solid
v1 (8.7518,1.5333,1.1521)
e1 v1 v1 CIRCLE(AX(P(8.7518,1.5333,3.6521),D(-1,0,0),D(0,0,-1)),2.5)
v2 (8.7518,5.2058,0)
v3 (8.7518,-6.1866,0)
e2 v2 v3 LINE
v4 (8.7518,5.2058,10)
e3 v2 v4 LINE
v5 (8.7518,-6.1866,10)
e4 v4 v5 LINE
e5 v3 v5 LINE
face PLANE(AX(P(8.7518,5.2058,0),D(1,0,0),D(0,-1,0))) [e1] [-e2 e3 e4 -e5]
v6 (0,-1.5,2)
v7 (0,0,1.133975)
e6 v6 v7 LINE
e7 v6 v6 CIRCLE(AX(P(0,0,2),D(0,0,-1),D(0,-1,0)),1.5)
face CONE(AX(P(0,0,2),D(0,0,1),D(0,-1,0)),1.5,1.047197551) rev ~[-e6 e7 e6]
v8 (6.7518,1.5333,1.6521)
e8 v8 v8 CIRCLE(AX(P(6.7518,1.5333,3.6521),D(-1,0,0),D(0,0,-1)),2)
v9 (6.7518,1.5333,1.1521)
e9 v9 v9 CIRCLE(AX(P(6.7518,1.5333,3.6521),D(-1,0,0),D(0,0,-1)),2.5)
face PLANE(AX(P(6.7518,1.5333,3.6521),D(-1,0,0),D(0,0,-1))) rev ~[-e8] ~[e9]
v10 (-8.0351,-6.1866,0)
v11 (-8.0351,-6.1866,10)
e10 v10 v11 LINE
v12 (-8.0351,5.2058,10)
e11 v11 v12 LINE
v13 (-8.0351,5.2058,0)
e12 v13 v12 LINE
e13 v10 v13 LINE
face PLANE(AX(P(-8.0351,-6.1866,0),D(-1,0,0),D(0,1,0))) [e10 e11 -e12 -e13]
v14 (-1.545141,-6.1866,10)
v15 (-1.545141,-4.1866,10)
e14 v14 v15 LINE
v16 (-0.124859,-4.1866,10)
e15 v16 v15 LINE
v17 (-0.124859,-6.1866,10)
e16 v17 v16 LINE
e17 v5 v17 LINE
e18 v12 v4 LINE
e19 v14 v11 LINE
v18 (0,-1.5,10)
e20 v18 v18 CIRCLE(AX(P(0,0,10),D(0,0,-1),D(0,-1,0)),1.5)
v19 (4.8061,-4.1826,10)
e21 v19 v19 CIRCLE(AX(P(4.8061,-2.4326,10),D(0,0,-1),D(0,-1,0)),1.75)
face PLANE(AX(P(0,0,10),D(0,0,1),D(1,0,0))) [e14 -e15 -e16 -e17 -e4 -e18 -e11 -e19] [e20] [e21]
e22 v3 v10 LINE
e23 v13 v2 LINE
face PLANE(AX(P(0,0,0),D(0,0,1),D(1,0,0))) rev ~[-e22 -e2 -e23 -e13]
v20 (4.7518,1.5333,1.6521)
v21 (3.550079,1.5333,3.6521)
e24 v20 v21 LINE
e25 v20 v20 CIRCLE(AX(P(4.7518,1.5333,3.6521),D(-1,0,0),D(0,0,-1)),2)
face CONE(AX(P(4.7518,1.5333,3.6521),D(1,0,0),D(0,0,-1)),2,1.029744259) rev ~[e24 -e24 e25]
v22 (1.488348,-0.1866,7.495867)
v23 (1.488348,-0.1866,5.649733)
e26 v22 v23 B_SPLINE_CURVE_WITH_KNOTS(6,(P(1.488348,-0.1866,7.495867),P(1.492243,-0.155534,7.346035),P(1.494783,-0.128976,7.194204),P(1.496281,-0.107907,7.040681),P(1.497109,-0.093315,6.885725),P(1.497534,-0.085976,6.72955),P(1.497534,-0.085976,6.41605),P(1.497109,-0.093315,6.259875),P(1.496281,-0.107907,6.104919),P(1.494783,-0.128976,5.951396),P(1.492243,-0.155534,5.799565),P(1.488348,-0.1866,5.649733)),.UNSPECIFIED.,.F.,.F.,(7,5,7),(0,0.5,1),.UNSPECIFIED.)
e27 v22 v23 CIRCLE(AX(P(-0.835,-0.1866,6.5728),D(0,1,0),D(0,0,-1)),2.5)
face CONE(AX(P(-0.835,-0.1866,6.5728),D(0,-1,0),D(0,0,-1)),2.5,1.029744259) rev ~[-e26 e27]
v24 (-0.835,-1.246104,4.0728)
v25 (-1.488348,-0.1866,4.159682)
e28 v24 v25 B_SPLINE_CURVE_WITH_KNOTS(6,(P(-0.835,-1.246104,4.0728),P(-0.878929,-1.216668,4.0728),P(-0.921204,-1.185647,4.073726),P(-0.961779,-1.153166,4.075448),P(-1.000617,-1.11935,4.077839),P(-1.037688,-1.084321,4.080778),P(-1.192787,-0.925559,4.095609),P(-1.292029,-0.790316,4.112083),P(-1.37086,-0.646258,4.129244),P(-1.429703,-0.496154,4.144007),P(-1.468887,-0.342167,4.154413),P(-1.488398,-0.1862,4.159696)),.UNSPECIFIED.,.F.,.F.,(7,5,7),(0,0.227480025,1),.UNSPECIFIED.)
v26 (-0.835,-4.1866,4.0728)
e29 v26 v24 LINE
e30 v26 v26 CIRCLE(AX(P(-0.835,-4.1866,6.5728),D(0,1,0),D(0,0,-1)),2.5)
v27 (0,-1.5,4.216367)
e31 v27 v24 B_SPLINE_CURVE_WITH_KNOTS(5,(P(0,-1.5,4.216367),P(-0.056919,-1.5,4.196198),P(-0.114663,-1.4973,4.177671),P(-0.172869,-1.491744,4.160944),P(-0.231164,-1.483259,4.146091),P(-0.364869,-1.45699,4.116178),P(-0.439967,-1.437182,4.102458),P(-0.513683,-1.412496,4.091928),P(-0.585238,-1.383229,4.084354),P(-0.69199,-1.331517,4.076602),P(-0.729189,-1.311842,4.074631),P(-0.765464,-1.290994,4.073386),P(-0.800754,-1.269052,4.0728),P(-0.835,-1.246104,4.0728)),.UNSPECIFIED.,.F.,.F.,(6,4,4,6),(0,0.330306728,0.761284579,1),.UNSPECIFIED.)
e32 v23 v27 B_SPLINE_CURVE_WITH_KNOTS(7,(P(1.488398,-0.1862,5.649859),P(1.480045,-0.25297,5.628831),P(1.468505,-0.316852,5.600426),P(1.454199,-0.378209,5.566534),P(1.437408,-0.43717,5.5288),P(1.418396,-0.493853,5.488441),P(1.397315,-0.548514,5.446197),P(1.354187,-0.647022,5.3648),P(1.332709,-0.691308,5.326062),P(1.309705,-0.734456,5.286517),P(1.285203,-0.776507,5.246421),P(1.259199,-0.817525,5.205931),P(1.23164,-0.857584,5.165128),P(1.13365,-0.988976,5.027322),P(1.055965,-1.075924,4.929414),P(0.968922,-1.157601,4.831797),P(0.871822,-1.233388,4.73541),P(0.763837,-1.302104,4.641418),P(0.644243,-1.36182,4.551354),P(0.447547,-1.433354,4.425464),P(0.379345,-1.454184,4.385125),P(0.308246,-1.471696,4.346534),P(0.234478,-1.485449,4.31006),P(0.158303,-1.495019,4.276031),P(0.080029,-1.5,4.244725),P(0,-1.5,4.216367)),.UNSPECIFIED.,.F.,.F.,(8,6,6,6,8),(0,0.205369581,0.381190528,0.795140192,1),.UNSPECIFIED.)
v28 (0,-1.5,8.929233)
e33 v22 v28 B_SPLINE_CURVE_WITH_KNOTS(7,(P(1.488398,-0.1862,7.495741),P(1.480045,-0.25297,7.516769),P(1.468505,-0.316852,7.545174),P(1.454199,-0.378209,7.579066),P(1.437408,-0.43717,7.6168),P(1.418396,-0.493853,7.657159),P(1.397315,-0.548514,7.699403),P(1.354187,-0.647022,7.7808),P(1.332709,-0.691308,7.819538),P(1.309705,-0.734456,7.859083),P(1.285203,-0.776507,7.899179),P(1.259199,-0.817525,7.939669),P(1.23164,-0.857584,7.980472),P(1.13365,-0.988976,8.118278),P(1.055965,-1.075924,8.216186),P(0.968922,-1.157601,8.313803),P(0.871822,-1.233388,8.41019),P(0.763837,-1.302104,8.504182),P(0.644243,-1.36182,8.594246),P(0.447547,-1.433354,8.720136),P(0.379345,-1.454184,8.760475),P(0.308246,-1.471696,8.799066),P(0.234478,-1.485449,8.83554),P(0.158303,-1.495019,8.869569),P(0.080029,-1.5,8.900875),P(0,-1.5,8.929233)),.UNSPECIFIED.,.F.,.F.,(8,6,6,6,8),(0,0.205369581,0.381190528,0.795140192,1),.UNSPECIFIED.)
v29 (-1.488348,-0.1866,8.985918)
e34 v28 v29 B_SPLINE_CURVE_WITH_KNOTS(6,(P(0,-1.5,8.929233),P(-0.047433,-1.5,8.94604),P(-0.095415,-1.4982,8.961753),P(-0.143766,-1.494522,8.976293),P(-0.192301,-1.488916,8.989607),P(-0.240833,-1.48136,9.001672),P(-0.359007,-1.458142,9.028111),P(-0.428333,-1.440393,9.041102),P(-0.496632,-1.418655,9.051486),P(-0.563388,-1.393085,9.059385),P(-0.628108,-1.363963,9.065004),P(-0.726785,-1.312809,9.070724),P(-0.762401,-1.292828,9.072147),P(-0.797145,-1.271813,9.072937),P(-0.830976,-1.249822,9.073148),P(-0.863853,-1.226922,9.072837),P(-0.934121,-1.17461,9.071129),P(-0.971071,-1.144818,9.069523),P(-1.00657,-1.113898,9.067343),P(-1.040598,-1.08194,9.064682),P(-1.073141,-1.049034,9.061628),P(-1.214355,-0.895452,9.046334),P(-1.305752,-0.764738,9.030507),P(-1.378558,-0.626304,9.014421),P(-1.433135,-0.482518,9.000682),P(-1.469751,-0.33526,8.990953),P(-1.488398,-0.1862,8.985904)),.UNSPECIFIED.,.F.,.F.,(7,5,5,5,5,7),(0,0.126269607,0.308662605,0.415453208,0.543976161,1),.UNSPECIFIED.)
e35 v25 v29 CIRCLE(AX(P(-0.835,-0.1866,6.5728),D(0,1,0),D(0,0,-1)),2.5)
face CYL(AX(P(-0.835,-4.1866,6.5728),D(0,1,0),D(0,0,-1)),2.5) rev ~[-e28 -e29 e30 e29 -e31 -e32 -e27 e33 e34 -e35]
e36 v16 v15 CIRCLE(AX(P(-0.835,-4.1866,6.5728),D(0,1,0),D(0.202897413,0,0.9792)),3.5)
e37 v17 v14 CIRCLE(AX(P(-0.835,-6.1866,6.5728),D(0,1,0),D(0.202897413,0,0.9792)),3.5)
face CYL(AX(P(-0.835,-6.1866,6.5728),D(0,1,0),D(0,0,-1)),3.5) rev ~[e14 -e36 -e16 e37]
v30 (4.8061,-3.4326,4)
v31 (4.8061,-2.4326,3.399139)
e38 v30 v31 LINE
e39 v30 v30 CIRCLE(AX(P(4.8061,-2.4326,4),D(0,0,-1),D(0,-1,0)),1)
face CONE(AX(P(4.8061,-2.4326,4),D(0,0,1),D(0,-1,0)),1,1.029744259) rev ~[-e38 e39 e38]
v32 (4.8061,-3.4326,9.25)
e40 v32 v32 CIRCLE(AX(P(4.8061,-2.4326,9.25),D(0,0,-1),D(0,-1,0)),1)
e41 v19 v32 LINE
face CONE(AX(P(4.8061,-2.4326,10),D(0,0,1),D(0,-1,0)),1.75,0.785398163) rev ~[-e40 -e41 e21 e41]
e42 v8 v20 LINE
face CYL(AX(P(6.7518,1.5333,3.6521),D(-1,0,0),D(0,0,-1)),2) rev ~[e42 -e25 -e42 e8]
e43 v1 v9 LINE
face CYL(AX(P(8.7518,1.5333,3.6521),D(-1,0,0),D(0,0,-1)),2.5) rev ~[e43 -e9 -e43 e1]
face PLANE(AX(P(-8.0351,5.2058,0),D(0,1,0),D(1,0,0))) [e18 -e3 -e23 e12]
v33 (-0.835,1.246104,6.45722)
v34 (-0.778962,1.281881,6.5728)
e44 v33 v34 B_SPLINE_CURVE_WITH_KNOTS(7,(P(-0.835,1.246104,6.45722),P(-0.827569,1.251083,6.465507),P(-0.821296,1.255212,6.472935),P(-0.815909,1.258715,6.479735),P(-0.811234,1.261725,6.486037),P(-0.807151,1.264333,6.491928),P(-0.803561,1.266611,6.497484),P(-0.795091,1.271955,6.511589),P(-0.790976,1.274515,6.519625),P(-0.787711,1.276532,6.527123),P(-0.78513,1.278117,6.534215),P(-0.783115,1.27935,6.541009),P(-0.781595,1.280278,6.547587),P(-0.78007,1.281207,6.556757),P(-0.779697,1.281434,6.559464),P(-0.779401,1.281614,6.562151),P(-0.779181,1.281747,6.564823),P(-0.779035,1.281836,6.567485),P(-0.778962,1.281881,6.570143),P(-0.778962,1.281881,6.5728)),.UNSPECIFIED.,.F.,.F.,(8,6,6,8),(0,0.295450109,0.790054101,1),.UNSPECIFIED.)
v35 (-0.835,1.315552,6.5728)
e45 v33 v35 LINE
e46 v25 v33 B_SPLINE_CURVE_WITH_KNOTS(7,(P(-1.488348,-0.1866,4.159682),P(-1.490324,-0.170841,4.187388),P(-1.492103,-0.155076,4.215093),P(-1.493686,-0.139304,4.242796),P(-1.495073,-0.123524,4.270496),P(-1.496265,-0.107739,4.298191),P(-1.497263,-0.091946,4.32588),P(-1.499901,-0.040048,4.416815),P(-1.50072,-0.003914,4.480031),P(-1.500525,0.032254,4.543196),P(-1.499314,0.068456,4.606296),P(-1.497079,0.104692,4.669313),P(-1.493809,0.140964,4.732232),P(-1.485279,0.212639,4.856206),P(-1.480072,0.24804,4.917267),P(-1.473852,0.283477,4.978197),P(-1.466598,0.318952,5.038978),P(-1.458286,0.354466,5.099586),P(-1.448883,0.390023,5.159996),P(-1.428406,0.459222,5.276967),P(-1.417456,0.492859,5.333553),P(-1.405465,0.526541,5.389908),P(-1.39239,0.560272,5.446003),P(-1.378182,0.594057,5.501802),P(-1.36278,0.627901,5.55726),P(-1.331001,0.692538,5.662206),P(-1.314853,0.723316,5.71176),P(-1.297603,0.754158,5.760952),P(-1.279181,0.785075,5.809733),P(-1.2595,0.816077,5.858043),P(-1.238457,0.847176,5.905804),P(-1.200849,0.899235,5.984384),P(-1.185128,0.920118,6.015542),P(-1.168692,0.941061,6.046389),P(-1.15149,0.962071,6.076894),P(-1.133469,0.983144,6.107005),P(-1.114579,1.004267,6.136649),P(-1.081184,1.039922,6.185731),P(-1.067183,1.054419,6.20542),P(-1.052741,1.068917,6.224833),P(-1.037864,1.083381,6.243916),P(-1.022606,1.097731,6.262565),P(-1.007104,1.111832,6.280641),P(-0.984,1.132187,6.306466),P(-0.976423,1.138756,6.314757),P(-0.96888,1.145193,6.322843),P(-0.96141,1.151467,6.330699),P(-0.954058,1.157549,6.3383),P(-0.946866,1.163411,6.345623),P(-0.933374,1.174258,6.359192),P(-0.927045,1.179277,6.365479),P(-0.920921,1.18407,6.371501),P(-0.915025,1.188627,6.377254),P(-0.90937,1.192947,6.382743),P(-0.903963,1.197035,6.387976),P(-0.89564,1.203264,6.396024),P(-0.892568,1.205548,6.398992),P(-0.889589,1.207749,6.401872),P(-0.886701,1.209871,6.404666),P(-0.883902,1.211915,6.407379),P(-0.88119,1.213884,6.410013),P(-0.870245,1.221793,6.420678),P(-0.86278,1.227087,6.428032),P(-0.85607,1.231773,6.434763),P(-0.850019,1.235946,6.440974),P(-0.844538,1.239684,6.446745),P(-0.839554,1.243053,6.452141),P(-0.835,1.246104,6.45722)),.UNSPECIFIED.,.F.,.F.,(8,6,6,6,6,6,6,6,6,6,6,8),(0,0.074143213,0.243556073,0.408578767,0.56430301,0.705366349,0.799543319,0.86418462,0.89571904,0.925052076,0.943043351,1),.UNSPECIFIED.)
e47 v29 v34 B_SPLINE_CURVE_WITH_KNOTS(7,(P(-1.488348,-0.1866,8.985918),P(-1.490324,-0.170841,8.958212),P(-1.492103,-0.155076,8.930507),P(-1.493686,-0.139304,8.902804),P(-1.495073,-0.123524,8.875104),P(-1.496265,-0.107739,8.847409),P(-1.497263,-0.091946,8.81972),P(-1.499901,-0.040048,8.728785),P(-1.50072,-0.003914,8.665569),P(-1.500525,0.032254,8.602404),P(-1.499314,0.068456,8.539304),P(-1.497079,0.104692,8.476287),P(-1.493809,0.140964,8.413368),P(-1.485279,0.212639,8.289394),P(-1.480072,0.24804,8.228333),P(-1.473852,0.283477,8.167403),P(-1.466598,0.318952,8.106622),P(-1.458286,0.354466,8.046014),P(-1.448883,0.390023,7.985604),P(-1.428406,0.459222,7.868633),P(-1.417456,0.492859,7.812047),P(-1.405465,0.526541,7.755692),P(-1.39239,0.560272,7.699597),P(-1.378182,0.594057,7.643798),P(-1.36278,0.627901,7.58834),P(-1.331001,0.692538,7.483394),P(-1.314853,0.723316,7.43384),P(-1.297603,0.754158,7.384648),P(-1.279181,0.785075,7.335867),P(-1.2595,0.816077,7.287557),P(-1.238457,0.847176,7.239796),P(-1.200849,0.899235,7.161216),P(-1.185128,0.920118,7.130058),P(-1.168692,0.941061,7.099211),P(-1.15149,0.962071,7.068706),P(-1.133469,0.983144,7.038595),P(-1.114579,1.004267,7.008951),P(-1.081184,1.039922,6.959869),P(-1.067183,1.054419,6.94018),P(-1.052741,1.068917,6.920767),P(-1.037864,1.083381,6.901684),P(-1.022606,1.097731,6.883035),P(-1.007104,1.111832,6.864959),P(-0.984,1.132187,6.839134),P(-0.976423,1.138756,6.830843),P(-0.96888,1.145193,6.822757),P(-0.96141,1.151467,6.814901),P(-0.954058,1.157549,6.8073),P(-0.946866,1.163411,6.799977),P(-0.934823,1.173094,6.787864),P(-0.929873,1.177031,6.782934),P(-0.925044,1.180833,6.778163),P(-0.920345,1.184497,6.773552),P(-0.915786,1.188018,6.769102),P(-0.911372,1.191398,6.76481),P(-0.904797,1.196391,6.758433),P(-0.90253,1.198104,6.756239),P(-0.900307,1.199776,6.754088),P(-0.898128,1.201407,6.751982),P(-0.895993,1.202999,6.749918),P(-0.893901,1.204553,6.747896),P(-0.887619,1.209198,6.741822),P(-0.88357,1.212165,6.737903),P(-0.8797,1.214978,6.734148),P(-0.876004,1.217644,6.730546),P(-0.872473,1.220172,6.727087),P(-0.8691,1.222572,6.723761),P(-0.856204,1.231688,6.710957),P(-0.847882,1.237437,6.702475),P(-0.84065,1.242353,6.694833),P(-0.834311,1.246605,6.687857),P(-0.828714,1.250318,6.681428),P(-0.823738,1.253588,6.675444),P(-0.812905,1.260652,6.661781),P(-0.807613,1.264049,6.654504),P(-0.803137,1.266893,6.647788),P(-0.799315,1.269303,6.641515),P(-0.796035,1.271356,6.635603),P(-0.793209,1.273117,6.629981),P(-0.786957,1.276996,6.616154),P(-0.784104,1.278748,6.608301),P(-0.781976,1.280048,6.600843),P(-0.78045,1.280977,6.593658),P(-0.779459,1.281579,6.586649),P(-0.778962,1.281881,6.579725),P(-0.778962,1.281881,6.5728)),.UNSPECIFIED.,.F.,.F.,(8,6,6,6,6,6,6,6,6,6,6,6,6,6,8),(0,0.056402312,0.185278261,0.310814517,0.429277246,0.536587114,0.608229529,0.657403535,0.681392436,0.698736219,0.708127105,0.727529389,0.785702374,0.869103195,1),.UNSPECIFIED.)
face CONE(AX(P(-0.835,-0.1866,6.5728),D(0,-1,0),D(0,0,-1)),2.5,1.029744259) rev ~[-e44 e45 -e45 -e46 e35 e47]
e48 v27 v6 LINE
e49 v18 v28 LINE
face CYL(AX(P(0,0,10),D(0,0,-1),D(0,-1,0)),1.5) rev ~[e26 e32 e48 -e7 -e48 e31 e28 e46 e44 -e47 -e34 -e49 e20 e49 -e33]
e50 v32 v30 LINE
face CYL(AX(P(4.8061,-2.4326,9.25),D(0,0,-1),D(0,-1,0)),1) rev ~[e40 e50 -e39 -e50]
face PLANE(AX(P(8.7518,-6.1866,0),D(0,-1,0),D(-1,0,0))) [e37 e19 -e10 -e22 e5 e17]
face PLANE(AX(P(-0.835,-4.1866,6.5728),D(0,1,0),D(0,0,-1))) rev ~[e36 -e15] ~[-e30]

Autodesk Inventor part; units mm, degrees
ref_plane "YZ Plane" through (0, 0, 0) normal (1, 0, 0) x (0, 1, 0)
ref_plane "XZ Plane" through (0, 0, 0) normal (0, 1, 0) x (-1, 0, 0)
ref_plane "XY Plane" through (0, 0, 0) normal (0, 0, 1) x (1, 0, 0)
sketch "Skizze1" plane through (0, 0, 0) normal (0, 0, 1) x (1, 0, 0)
  line L0 (-8.0351, 5.2058) -> (8.7518, 5.2058)
  line L1 (8.7518, 5.2058) -> (8.7518, -6.1866)
  line L2 (8.7518, -6.1866) -> (-8.0351, -6.1866)
  line L3 (-8.0351, -6.1866) -> (-8.0351, 5.2058)
  point P0 (0, 0)
extrude "Extrusion1" add sketch "Skizze1" along normal blind 10
sketch "Skizze2" plane through (0, 0, 10) normal (0, 0, 1) x (1, 0, 0)
  point P0 (0, 0)
hole "Drill01" at (0, 0, 10) direction (0, 0, -1) diameter 3 depth 8 tip angle 120
hole "Drill02" at (8.7518, 1.5333, 3.6521) direction (-1, 0, 0) diameter 4 depth 4 tip angle 118 counterbore diameter 5 counterbore depth 2
hole "Drill03" at (-0.835, -6.1866, 6.5728) direction (0, 1, 0) diameter 5 depth 6 tip angle 118 counterbore diameter 7 counterbore depth 2
hole "Drill04" at (4.8061, -2.4326, 10) direction (0, 0, -1) diameter 2 depth 6 tip angle 118 countersink diameter 3.5 countersink angle 90
properties part number "FxDrill_02"
